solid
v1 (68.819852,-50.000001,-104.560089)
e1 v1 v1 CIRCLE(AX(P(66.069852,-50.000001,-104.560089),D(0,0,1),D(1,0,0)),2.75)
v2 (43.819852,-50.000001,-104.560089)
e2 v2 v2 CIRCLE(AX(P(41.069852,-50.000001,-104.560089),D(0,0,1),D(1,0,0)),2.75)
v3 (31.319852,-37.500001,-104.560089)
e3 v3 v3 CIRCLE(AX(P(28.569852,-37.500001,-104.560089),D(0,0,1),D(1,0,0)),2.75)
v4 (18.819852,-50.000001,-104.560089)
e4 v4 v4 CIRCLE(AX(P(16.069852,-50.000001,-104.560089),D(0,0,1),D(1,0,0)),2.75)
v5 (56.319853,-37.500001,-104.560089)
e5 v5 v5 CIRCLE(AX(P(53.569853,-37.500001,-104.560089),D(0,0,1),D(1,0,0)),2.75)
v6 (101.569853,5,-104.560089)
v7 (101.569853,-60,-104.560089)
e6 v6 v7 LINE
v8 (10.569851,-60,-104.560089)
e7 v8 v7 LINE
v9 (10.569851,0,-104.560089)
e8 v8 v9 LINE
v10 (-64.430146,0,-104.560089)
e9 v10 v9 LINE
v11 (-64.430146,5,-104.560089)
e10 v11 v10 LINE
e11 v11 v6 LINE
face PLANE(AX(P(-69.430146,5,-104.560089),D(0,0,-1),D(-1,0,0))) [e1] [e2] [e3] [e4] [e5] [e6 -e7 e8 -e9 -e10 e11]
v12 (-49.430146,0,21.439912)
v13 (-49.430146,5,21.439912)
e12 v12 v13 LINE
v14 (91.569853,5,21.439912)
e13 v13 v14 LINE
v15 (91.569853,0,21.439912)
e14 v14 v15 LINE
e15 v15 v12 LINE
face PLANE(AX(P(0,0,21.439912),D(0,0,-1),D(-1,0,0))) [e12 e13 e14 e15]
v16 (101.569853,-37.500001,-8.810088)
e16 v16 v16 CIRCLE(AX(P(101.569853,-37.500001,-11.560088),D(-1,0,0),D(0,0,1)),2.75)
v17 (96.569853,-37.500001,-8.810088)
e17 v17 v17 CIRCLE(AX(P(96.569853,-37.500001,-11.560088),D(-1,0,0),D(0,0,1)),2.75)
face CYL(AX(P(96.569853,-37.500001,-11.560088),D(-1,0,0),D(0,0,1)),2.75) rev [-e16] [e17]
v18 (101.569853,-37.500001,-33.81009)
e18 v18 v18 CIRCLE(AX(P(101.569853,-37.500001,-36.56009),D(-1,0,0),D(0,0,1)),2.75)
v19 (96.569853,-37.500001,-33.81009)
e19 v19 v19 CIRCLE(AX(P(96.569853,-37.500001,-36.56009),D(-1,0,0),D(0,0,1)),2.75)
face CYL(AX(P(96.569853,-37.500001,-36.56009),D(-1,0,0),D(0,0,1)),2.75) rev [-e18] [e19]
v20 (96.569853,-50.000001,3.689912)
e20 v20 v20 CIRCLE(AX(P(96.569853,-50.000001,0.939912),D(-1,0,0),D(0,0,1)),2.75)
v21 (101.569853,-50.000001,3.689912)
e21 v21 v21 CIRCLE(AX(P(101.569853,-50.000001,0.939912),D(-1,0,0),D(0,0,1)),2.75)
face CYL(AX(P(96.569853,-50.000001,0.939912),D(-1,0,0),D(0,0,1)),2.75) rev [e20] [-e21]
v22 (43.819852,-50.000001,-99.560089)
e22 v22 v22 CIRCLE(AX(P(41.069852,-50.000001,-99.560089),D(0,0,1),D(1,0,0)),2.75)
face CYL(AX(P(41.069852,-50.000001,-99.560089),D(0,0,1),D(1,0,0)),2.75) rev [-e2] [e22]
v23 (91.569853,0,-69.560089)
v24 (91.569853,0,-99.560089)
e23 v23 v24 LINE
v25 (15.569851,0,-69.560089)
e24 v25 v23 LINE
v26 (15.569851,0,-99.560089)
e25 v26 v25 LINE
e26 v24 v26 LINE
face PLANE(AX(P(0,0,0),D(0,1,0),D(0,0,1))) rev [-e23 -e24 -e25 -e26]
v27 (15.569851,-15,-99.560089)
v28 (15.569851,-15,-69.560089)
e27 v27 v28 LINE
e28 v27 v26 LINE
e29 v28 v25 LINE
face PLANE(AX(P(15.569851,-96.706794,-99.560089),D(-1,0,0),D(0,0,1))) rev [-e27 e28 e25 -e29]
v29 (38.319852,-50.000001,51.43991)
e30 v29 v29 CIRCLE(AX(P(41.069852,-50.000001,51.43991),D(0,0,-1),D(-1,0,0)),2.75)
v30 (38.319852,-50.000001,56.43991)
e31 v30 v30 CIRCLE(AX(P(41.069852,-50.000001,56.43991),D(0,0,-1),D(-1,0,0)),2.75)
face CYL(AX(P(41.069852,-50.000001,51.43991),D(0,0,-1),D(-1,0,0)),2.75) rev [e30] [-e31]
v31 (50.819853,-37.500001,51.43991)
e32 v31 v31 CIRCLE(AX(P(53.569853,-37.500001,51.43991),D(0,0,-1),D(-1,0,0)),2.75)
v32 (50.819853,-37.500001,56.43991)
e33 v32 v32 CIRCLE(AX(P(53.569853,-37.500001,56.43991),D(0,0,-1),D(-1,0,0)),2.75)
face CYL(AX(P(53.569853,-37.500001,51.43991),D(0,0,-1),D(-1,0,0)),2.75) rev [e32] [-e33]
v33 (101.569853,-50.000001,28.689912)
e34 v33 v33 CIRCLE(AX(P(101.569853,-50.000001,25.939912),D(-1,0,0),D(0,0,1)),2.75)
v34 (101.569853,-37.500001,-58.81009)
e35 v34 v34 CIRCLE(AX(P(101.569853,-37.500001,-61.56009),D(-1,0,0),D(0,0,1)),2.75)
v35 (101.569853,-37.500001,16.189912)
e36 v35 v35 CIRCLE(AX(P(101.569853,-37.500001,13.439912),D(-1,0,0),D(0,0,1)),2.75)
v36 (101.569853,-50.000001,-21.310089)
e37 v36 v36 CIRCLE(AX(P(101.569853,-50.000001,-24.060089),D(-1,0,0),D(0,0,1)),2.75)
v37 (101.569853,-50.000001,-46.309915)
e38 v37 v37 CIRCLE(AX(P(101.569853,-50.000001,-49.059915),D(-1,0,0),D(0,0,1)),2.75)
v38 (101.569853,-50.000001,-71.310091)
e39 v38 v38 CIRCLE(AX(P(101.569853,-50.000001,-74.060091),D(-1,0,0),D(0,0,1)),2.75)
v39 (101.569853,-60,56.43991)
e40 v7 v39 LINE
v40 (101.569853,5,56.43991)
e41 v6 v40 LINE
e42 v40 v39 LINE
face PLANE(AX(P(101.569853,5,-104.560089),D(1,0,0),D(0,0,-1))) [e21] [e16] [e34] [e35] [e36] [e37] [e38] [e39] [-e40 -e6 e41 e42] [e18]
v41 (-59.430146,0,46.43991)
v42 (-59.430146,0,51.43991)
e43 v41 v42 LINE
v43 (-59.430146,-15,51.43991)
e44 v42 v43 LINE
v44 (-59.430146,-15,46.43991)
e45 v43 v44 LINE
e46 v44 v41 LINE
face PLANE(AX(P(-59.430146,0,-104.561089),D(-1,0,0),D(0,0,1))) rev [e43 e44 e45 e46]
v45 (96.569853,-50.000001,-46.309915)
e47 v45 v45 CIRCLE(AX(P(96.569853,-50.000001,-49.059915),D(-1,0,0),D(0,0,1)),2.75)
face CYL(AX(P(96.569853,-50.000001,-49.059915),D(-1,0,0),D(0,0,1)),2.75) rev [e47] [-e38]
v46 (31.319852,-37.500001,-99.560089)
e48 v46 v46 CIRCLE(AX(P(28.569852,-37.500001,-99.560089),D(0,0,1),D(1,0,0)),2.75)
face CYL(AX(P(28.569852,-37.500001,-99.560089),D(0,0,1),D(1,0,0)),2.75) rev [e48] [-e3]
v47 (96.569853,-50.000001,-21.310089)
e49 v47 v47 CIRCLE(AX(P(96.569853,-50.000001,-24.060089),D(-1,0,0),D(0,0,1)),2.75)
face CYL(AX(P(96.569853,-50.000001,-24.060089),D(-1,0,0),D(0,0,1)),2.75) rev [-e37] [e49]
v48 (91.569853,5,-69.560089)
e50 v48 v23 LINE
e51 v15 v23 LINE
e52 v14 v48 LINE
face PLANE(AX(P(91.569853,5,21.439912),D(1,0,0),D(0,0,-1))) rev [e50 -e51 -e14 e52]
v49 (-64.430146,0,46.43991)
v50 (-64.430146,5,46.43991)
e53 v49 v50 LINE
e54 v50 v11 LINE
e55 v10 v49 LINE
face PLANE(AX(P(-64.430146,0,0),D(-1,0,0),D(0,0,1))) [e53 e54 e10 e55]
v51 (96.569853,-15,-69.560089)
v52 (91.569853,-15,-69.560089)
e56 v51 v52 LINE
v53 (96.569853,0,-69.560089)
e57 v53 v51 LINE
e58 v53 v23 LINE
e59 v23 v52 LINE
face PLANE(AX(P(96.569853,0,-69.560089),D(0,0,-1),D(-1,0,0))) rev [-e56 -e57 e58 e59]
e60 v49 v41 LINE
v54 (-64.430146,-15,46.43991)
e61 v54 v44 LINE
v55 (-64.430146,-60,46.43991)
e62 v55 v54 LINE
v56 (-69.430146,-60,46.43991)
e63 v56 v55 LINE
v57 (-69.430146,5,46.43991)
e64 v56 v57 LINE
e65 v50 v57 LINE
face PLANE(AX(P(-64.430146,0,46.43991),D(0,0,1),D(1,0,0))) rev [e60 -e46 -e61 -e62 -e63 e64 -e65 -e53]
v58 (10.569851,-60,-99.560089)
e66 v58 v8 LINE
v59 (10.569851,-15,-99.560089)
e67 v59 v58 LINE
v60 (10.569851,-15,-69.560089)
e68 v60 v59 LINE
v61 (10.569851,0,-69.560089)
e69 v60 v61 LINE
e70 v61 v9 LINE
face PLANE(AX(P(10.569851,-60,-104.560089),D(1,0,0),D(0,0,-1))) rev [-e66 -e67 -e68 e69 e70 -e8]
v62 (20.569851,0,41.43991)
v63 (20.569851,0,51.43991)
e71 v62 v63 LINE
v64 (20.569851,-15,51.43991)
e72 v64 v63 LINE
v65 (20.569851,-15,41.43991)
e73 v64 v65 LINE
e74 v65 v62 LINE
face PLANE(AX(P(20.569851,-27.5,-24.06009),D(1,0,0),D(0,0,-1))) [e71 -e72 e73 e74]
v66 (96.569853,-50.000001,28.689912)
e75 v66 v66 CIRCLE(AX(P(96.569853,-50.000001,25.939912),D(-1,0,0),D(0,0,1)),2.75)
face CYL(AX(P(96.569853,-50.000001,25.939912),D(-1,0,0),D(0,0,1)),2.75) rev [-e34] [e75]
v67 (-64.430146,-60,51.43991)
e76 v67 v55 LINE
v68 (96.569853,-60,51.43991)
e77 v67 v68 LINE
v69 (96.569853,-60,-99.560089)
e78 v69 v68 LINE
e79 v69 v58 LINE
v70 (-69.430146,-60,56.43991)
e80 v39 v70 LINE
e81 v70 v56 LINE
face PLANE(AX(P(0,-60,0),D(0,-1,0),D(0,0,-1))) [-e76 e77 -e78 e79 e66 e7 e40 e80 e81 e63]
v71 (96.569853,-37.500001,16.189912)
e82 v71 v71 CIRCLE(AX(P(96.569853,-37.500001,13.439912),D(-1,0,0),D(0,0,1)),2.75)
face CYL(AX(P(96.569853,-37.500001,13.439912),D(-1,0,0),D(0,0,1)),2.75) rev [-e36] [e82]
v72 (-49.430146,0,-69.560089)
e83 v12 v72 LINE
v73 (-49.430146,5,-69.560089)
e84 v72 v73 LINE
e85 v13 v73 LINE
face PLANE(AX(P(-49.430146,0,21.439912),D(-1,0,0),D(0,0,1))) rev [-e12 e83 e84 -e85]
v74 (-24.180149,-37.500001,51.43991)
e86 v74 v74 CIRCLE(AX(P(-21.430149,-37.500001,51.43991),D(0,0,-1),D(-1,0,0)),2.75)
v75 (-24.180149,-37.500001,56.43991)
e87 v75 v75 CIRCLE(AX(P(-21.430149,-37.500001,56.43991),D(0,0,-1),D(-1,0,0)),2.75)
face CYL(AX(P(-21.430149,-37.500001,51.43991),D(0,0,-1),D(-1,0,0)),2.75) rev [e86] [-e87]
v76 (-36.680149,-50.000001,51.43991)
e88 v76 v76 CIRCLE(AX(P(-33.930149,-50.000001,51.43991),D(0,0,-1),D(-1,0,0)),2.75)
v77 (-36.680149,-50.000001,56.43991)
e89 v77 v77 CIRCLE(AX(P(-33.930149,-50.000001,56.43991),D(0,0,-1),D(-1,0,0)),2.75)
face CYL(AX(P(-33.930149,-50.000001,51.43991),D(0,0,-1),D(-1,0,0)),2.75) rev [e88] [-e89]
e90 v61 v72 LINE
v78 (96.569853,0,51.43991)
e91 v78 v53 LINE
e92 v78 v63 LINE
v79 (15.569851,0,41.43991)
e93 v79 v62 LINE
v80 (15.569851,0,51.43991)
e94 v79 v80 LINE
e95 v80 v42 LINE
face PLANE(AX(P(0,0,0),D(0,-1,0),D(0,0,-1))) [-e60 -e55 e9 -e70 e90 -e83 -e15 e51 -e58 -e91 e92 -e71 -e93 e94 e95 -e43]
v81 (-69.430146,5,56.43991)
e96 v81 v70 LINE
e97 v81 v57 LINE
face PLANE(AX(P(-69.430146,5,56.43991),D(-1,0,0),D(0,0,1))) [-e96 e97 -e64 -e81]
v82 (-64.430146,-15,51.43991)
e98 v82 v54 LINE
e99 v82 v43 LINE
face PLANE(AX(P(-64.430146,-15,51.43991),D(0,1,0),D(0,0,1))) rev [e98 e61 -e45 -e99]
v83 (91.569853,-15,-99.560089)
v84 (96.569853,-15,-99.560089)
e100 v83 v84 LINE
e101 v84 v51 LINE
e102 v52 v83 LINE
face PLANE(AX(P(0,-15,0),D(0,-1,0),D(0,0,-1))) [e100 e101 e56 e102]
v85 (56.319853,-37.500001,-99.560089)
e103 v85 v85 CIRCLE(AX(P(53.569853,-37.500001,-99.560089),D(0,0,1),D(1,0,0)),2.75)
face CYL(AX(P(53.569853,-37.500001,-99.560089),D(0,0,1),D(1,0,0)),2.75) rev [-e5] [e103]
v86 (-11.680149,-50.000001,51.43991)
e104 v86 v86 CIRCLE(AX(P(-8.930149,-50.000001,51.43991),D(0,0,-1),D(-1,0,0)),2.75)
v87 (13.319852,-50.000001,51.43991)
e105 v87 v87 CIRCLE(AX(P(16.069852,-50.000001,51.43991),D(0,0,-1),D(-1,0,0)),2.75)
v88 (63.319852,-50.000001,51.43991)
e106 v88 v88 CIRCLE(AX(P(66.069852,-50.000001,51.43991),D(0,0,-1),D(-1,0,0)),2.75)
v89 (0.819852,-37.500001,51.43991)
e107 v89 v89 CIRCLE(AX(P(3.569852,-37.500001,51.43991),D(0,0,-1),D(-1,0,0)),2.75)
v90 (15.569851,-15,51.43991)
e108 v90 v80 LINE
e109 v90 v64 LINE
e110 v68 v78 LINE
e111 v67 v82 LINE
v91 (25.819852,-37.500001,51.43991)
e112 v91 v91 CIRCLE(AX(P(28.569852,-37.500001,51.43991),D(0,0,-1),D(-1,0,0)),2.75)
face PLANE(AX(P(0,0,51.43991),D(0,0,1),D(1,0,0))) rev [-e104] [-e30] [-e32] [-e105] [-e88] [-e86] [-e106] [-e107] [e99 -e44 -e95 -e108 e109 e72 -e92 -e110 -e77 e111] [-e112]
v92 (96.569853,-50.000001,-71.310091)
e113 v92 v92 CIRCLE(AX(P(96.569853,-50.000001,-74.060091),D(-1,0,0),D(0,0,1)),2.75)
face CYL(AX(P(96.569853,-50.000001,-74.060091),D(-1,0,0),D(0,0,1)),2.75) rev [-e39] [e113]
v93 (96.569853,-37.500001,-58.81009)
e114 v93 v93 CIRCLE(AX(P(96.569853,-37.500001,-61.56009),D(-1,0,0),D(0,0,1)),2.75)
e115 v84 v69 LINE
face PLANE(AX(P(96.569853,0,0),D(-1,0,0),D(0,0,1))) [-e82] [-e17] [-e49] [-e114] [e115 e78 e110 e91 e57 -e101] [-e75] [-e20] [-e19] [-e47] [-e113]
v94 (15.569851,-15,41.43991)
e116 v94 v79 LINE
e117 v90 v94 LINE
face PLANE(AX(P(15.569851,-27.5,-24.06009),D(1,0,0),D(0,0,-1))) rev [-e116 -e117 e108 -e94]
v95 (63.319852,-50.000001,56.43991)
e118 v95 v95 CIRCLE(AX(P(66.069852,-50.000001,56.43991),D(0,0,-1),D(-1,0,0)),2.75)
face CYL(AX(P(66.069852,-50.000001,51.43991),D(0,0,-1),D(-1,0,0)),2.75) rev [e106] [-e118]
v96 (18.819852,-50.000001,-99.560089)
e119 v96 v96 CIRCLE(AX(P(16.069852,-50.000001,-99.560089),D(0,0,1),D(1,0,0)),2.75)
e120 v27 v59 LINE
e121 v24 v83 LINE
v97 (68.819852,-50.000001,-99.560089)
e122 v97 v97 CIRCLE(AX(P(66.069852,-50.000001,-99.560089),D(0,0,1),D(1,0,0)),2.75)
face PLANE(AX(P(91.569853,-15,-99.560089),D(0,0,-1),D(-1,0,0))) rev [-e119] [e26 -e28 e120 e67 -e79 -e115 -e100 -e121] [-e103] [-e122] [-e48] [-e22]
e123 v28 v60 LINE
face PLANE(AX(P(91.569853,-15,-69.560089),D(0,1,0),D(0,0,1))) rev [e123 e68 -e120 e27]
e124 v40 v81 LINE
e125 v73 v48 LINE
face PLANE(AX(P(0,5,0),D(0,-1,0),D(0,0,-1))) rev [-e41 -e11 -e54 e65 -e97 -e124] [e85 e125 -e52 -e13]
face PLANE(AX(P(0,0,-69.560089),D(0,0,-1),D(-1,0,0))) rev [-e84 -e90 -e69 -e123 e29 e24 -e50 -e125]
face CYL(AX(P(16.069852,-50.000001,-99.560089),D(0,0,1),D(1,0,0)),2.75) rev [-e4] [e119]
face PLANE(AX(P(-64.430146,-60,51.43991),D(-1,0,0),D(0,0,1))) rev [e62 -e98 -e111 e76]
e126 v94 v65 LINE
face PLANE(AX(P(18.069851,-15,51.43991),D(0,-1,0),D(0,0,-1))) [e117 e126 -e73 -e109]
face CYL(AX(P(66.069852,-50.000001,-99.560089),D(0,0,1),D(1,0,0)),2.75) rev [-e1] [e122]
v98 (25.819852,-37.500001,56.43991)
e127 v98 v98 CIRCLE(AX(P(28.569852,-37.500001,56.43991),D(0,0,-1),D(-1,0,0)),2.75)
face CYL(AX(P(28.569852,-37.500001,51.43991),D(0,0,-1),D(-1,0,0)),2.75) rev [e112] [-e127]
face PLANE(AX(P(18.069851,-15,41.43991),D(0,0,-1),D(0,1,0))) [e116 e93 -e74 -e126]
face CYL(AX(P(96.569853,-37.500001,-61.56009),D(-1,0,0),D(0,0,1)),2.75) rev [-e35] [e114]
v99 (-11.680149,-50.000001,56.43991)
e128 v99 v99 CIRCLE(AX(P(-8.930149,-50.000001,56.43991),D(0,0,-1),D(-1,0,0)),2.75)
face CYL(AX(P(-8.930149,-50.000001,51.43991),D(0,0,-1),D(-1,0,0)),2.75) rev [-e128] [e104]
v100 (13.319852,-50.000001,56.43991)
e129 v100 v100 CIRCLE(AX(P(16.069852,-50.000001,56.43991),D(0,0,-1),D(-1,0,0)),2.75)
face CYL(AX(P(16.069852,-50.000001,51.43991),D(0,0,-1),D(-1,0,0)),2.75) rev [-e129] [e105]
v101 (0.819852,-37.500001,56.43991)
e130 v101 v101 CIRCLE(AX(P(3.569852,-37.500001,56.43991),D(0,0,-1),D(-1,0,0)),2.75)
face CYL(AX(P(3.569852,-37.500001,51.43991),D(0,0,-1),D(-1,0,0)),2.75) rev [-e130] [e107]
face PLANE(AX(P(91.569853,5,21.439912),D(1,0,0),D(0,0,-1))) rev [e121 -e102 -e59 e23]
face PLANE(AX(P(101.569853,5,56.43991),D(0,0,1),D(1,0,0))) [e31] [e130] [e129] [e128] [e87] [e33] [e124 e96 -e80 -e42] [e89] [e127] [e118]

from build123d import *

# Parameters (mm, degrees)
SKETCH1_W                      = 170.999999046
SKETCH1_H                      = 160.999999046
BOSS_EXTRUDE1_DEPTH            = 5
SKETCH2_W                      = 150.999999046
SKETCH2_H                      = 5
CUT_EXTRUDE1_DEPTH             = 5
SKETCH3_W                      = 140.999999046
SKETCH3_H                      = 5
CUT_EXTRUDE2_DEPTH             = 91.000001431
BOSS_EXTRUDE2_DEPTH            = 60
SKETCH5_W                      = 30
SKETCH5_H                      = 45
CUT_EXTRUDE3_DEPTH             = 81.000001431
CUT_EXTRUDE4_REACH             = 159.636
SKETCH7_W                      = 76.000001431
SKETCH7_H                      = 30
SKETCH8_W                      = 115.999999046
SKETCH8_H                      = 60
CUT_EXTRUDE5_DEPTH             = 5
SKETCH9_W                      = 5
SKETCH9_H                      = 30
CUT_EXTRUDE6_DEPTH             = 45
CUT_EXTRUDE7_REACH             = 197.582
SKETCH10_W                     = 155.999999046
SKETCH10_H                     = 60
SKETCH11_W                     = 5
SKETCH11_H                     = 45
CUT_EXTRUDE8_DEPTH             = 5
F_5_5_5_5_DIAMETER_HOLE1_D     = 5.5
F_5_5_5_5_DIAMETER_HOLE2_D     = 5.5
F_5_5_5_5_DIAMETER_HOLE2_DEPTH = 5
F_5_5_5_5_DIAMETER_HOLE3_D     = 5.5
RIB1_START                     = -2.5
RIB1_OUTLINE_W                 = 10
RIB1_OUTLINE_H                 = 15
RIB1_DEPTH                     = 5


# Read off the part's stored shape, not the designer's step: Rib1
with BuildPart() as part:
    # Sketch1 → Boss-Extrude1 (new body)
    with BuildSketch(Plane.XZ):
        with Locations((16.069853306, -24.060089588)):
            Rectangle(SKETCH1_W, SKETCH1_H)
    extrude(amount=-BOSS_EXTRUDE1_DEPTH)

    # Sketch2 → Cut-Extrude1 (cut)
    with BuildSketch(Plane.ZY.offset(69.430146217)):
        with Locations((-29.060089588, 2.5)):
            Rectangle(SKETCH2_W, SKETCH2_H)
    extrude(amount=-CUT_EXTRUDE1_DEPTH, mode=Mode.SUBTRACT)

    # Sketch3 → Cut-Extrude2 (cut)
    with BuildSketch(Plane(origin=(0, 0, -69.560089111), x_dir=(-1, 0, 0), z_dir=(0, 0, -1))):
        with Locations((-21.069853306, 2.5)):
            Rectangle(SKETCH3_W, SKETCH3_H)
    extrude(amount=-CUT_EXTRUDE2_DEPTH, mode=Mode.SUBTRACT)

    # Sketch4 → Boss-Extrude2 (add)
    with BuildSketch(Plane.XZ):
        Polygon((91.569852829, 46.439909935), (-69.430146217, 46.439909935), (-69.430146217, 56.439909935), (101.569852829, 56.439909935), (101.569852829, -104.560089111), (10.569851398, -104.560089111), (10.569851398, -69.560089111), (91.569852829, -69.560089111), align=None)
    extrude(amount=BOSS_EXTRUDE2_DEPTH)

    # Sketch5 → Cut-Extrude3 (cut)
    with BuildSketch(Plane.ZY.offset(-10.569851398)):
        with Locations((-84.560089111, -37.5)):
            Rectangle(SKETCH5_W, SKETCH5_H)
    extrude(amount=-CUT_EXTRUDE3_DEPTH, mode=Mode.SUBTRACT)

    # Sketch7 → Cut-Extrude4 (cut, up to next)
    with BuildSketch(Plane(origin=(0, 0, 0), x_dir=(1, 0, 0), z_dir=(0, 1, 0)), mode=Mode.PRIVATE) as cut_extrude4_sk1:
        with Locations((53.569852114, 84.560089111)):
            Rectangle(SKETCH7_W, SKETCH7_H)
    cut_extrude4_tool1 = extrude(cut_extrude4_sk1.sketch, amount=-CUT_EXTRUDE4_REACH, mode=Mode.PRIVATE) & part.part
    add(cut_extrude4_tool1.solids().sort_by_distance((53.569852, 0, -84.560089))[0], mode=Mode.SUBTRACT)

    # Sketch8 → Cut-Extrude5 (cut)
    with BuildSketch(Plane.ZY.offset(-91.569852829)):
        with Locations((-11.560089588, -30)):
            Rectangle(SKETCH8_W, SKETCH8_H)
    extrude(amount=-CUT_EXTRUDE5_DEPTH, mode=Mode.SUBTRACT)

    # Sketch9 → Cut-Extrude6 (cut)
    with BuildSketch(Plane.XZ.offset(60)):
        with Locations((94.069852829, -84.560089111)):
            Rectangle(SKETCH9_W, SKETCH9_H)
    extrude(amount=-CUT_EXTRUDE6_DEPTH, mode=Mode.SUBTRACT)

    # Sketch10 → Cut-Extrude7 (cut, up to next)
    with BuildSketch(Plane.XY.offset(51.439909935), mode=Mode.PRIVATE) as cut_extrude7_sk1:
        with Locations((18.569853306, -30)):
            Rectangle(SKETCH10_W, SKETCH10_H)
    cut_extrude7_tool1 = extrude(cut_extrude7_sk1.sketch, amount=-CUT_EXTRUDE7_REACH, mode=Mode.PRIVATE) & part.part
    add(cut_extrude7_tool1.solids().sort_by_distance((18.569853, -30, 51.43991))[0], mode=Mode.SUBTRACT)

    # Sketch11 → Cut-Extrude8 (cut)
    with BuildSketch(Plane(origin=(0, 0, 46.439909935), x_dir=(-1, 0, 0), z_dir=(0, 0, -1))):
        with Locations((61.930146217, -37.5)):
            Rectangle(SKETCH11_W, SKETCH11_H)
    extrude(amount=-CUT_EXTRUDE8_DEPTH, mode=Mode.SUBTRACT)

    # Ø5.5 (5.5) Diameter Hole1 (through all)
    with Locations(Plane.ZY.offset(-96.569852829)):
        with Locations((-61.560090383, -37.500000596), (-74.06009078, -50.000000795), (-49.059914748, -50.000000795), (-36.560089588, -37.500000596), (-11.560088396, -37.500000596), (13.439912299, -37.500000596), (0.939911927, -50.000000795), (25.939911604, -50.000000795), (-24.060088595, -50.000000795)):
            Hole(F_5_5_5_5_DIAMETER_HOLE1_D / 2)

    # Ø5.5 (5.5) Diameter Hole2
    with Locations(Plane(origin=(0, 0, 51.439909935), x_dir=(-1, 0, 0), z_dir=(0, 0, -1))):
        with Locations((33.93014888, -50.000000795), (21.430148681, -37.500000596), (8.93014883, -50.000000795), (-3.569851859, -37.500000596), (-16.069851716, -50.000000795), (-28.569851518, -37.500000596), (-41.069852312, -50.000000795), (-53.569852511, -37.500000596), (-66.069851716, -50.000000795)):
            Hole(F_5_5_5_5_DIAMETER_HOLE2_D / 2, depth=F_5_5_5_5_DIAMETER_HOLE2_DEPTH)

    # Ø5.5 (5.5) Diameter Hole3 (through all)
    with Locations(Plane.XY.offset(-99.560089111)):
        with Locations((16.069851716, -50.000000795), (28.569851518, -37.500000596), (41.069852312, -50.000000795), (53.569852511, -37.500000596), (66.069851716, -50.000000795)):
            Hole(F_5_5_5_5_DIAMETER_HOLE3_D / 2)

    # Rib1 outline → Rib1 (add)
    with BuildSketch(Plane(origin=(18.069851398, 0, 0), x_dir=(0, 0, -1), z_dir=(1, 0, 0)).offset(RIB1_START)):
        with Locations((-46.439909935, -7.5)):
            Rectangle(RIB1_OUTLINE_W, RIB1_OUTLINE_H)
    extrude(amount=RIB1_DEPTH)


solid = part.part
